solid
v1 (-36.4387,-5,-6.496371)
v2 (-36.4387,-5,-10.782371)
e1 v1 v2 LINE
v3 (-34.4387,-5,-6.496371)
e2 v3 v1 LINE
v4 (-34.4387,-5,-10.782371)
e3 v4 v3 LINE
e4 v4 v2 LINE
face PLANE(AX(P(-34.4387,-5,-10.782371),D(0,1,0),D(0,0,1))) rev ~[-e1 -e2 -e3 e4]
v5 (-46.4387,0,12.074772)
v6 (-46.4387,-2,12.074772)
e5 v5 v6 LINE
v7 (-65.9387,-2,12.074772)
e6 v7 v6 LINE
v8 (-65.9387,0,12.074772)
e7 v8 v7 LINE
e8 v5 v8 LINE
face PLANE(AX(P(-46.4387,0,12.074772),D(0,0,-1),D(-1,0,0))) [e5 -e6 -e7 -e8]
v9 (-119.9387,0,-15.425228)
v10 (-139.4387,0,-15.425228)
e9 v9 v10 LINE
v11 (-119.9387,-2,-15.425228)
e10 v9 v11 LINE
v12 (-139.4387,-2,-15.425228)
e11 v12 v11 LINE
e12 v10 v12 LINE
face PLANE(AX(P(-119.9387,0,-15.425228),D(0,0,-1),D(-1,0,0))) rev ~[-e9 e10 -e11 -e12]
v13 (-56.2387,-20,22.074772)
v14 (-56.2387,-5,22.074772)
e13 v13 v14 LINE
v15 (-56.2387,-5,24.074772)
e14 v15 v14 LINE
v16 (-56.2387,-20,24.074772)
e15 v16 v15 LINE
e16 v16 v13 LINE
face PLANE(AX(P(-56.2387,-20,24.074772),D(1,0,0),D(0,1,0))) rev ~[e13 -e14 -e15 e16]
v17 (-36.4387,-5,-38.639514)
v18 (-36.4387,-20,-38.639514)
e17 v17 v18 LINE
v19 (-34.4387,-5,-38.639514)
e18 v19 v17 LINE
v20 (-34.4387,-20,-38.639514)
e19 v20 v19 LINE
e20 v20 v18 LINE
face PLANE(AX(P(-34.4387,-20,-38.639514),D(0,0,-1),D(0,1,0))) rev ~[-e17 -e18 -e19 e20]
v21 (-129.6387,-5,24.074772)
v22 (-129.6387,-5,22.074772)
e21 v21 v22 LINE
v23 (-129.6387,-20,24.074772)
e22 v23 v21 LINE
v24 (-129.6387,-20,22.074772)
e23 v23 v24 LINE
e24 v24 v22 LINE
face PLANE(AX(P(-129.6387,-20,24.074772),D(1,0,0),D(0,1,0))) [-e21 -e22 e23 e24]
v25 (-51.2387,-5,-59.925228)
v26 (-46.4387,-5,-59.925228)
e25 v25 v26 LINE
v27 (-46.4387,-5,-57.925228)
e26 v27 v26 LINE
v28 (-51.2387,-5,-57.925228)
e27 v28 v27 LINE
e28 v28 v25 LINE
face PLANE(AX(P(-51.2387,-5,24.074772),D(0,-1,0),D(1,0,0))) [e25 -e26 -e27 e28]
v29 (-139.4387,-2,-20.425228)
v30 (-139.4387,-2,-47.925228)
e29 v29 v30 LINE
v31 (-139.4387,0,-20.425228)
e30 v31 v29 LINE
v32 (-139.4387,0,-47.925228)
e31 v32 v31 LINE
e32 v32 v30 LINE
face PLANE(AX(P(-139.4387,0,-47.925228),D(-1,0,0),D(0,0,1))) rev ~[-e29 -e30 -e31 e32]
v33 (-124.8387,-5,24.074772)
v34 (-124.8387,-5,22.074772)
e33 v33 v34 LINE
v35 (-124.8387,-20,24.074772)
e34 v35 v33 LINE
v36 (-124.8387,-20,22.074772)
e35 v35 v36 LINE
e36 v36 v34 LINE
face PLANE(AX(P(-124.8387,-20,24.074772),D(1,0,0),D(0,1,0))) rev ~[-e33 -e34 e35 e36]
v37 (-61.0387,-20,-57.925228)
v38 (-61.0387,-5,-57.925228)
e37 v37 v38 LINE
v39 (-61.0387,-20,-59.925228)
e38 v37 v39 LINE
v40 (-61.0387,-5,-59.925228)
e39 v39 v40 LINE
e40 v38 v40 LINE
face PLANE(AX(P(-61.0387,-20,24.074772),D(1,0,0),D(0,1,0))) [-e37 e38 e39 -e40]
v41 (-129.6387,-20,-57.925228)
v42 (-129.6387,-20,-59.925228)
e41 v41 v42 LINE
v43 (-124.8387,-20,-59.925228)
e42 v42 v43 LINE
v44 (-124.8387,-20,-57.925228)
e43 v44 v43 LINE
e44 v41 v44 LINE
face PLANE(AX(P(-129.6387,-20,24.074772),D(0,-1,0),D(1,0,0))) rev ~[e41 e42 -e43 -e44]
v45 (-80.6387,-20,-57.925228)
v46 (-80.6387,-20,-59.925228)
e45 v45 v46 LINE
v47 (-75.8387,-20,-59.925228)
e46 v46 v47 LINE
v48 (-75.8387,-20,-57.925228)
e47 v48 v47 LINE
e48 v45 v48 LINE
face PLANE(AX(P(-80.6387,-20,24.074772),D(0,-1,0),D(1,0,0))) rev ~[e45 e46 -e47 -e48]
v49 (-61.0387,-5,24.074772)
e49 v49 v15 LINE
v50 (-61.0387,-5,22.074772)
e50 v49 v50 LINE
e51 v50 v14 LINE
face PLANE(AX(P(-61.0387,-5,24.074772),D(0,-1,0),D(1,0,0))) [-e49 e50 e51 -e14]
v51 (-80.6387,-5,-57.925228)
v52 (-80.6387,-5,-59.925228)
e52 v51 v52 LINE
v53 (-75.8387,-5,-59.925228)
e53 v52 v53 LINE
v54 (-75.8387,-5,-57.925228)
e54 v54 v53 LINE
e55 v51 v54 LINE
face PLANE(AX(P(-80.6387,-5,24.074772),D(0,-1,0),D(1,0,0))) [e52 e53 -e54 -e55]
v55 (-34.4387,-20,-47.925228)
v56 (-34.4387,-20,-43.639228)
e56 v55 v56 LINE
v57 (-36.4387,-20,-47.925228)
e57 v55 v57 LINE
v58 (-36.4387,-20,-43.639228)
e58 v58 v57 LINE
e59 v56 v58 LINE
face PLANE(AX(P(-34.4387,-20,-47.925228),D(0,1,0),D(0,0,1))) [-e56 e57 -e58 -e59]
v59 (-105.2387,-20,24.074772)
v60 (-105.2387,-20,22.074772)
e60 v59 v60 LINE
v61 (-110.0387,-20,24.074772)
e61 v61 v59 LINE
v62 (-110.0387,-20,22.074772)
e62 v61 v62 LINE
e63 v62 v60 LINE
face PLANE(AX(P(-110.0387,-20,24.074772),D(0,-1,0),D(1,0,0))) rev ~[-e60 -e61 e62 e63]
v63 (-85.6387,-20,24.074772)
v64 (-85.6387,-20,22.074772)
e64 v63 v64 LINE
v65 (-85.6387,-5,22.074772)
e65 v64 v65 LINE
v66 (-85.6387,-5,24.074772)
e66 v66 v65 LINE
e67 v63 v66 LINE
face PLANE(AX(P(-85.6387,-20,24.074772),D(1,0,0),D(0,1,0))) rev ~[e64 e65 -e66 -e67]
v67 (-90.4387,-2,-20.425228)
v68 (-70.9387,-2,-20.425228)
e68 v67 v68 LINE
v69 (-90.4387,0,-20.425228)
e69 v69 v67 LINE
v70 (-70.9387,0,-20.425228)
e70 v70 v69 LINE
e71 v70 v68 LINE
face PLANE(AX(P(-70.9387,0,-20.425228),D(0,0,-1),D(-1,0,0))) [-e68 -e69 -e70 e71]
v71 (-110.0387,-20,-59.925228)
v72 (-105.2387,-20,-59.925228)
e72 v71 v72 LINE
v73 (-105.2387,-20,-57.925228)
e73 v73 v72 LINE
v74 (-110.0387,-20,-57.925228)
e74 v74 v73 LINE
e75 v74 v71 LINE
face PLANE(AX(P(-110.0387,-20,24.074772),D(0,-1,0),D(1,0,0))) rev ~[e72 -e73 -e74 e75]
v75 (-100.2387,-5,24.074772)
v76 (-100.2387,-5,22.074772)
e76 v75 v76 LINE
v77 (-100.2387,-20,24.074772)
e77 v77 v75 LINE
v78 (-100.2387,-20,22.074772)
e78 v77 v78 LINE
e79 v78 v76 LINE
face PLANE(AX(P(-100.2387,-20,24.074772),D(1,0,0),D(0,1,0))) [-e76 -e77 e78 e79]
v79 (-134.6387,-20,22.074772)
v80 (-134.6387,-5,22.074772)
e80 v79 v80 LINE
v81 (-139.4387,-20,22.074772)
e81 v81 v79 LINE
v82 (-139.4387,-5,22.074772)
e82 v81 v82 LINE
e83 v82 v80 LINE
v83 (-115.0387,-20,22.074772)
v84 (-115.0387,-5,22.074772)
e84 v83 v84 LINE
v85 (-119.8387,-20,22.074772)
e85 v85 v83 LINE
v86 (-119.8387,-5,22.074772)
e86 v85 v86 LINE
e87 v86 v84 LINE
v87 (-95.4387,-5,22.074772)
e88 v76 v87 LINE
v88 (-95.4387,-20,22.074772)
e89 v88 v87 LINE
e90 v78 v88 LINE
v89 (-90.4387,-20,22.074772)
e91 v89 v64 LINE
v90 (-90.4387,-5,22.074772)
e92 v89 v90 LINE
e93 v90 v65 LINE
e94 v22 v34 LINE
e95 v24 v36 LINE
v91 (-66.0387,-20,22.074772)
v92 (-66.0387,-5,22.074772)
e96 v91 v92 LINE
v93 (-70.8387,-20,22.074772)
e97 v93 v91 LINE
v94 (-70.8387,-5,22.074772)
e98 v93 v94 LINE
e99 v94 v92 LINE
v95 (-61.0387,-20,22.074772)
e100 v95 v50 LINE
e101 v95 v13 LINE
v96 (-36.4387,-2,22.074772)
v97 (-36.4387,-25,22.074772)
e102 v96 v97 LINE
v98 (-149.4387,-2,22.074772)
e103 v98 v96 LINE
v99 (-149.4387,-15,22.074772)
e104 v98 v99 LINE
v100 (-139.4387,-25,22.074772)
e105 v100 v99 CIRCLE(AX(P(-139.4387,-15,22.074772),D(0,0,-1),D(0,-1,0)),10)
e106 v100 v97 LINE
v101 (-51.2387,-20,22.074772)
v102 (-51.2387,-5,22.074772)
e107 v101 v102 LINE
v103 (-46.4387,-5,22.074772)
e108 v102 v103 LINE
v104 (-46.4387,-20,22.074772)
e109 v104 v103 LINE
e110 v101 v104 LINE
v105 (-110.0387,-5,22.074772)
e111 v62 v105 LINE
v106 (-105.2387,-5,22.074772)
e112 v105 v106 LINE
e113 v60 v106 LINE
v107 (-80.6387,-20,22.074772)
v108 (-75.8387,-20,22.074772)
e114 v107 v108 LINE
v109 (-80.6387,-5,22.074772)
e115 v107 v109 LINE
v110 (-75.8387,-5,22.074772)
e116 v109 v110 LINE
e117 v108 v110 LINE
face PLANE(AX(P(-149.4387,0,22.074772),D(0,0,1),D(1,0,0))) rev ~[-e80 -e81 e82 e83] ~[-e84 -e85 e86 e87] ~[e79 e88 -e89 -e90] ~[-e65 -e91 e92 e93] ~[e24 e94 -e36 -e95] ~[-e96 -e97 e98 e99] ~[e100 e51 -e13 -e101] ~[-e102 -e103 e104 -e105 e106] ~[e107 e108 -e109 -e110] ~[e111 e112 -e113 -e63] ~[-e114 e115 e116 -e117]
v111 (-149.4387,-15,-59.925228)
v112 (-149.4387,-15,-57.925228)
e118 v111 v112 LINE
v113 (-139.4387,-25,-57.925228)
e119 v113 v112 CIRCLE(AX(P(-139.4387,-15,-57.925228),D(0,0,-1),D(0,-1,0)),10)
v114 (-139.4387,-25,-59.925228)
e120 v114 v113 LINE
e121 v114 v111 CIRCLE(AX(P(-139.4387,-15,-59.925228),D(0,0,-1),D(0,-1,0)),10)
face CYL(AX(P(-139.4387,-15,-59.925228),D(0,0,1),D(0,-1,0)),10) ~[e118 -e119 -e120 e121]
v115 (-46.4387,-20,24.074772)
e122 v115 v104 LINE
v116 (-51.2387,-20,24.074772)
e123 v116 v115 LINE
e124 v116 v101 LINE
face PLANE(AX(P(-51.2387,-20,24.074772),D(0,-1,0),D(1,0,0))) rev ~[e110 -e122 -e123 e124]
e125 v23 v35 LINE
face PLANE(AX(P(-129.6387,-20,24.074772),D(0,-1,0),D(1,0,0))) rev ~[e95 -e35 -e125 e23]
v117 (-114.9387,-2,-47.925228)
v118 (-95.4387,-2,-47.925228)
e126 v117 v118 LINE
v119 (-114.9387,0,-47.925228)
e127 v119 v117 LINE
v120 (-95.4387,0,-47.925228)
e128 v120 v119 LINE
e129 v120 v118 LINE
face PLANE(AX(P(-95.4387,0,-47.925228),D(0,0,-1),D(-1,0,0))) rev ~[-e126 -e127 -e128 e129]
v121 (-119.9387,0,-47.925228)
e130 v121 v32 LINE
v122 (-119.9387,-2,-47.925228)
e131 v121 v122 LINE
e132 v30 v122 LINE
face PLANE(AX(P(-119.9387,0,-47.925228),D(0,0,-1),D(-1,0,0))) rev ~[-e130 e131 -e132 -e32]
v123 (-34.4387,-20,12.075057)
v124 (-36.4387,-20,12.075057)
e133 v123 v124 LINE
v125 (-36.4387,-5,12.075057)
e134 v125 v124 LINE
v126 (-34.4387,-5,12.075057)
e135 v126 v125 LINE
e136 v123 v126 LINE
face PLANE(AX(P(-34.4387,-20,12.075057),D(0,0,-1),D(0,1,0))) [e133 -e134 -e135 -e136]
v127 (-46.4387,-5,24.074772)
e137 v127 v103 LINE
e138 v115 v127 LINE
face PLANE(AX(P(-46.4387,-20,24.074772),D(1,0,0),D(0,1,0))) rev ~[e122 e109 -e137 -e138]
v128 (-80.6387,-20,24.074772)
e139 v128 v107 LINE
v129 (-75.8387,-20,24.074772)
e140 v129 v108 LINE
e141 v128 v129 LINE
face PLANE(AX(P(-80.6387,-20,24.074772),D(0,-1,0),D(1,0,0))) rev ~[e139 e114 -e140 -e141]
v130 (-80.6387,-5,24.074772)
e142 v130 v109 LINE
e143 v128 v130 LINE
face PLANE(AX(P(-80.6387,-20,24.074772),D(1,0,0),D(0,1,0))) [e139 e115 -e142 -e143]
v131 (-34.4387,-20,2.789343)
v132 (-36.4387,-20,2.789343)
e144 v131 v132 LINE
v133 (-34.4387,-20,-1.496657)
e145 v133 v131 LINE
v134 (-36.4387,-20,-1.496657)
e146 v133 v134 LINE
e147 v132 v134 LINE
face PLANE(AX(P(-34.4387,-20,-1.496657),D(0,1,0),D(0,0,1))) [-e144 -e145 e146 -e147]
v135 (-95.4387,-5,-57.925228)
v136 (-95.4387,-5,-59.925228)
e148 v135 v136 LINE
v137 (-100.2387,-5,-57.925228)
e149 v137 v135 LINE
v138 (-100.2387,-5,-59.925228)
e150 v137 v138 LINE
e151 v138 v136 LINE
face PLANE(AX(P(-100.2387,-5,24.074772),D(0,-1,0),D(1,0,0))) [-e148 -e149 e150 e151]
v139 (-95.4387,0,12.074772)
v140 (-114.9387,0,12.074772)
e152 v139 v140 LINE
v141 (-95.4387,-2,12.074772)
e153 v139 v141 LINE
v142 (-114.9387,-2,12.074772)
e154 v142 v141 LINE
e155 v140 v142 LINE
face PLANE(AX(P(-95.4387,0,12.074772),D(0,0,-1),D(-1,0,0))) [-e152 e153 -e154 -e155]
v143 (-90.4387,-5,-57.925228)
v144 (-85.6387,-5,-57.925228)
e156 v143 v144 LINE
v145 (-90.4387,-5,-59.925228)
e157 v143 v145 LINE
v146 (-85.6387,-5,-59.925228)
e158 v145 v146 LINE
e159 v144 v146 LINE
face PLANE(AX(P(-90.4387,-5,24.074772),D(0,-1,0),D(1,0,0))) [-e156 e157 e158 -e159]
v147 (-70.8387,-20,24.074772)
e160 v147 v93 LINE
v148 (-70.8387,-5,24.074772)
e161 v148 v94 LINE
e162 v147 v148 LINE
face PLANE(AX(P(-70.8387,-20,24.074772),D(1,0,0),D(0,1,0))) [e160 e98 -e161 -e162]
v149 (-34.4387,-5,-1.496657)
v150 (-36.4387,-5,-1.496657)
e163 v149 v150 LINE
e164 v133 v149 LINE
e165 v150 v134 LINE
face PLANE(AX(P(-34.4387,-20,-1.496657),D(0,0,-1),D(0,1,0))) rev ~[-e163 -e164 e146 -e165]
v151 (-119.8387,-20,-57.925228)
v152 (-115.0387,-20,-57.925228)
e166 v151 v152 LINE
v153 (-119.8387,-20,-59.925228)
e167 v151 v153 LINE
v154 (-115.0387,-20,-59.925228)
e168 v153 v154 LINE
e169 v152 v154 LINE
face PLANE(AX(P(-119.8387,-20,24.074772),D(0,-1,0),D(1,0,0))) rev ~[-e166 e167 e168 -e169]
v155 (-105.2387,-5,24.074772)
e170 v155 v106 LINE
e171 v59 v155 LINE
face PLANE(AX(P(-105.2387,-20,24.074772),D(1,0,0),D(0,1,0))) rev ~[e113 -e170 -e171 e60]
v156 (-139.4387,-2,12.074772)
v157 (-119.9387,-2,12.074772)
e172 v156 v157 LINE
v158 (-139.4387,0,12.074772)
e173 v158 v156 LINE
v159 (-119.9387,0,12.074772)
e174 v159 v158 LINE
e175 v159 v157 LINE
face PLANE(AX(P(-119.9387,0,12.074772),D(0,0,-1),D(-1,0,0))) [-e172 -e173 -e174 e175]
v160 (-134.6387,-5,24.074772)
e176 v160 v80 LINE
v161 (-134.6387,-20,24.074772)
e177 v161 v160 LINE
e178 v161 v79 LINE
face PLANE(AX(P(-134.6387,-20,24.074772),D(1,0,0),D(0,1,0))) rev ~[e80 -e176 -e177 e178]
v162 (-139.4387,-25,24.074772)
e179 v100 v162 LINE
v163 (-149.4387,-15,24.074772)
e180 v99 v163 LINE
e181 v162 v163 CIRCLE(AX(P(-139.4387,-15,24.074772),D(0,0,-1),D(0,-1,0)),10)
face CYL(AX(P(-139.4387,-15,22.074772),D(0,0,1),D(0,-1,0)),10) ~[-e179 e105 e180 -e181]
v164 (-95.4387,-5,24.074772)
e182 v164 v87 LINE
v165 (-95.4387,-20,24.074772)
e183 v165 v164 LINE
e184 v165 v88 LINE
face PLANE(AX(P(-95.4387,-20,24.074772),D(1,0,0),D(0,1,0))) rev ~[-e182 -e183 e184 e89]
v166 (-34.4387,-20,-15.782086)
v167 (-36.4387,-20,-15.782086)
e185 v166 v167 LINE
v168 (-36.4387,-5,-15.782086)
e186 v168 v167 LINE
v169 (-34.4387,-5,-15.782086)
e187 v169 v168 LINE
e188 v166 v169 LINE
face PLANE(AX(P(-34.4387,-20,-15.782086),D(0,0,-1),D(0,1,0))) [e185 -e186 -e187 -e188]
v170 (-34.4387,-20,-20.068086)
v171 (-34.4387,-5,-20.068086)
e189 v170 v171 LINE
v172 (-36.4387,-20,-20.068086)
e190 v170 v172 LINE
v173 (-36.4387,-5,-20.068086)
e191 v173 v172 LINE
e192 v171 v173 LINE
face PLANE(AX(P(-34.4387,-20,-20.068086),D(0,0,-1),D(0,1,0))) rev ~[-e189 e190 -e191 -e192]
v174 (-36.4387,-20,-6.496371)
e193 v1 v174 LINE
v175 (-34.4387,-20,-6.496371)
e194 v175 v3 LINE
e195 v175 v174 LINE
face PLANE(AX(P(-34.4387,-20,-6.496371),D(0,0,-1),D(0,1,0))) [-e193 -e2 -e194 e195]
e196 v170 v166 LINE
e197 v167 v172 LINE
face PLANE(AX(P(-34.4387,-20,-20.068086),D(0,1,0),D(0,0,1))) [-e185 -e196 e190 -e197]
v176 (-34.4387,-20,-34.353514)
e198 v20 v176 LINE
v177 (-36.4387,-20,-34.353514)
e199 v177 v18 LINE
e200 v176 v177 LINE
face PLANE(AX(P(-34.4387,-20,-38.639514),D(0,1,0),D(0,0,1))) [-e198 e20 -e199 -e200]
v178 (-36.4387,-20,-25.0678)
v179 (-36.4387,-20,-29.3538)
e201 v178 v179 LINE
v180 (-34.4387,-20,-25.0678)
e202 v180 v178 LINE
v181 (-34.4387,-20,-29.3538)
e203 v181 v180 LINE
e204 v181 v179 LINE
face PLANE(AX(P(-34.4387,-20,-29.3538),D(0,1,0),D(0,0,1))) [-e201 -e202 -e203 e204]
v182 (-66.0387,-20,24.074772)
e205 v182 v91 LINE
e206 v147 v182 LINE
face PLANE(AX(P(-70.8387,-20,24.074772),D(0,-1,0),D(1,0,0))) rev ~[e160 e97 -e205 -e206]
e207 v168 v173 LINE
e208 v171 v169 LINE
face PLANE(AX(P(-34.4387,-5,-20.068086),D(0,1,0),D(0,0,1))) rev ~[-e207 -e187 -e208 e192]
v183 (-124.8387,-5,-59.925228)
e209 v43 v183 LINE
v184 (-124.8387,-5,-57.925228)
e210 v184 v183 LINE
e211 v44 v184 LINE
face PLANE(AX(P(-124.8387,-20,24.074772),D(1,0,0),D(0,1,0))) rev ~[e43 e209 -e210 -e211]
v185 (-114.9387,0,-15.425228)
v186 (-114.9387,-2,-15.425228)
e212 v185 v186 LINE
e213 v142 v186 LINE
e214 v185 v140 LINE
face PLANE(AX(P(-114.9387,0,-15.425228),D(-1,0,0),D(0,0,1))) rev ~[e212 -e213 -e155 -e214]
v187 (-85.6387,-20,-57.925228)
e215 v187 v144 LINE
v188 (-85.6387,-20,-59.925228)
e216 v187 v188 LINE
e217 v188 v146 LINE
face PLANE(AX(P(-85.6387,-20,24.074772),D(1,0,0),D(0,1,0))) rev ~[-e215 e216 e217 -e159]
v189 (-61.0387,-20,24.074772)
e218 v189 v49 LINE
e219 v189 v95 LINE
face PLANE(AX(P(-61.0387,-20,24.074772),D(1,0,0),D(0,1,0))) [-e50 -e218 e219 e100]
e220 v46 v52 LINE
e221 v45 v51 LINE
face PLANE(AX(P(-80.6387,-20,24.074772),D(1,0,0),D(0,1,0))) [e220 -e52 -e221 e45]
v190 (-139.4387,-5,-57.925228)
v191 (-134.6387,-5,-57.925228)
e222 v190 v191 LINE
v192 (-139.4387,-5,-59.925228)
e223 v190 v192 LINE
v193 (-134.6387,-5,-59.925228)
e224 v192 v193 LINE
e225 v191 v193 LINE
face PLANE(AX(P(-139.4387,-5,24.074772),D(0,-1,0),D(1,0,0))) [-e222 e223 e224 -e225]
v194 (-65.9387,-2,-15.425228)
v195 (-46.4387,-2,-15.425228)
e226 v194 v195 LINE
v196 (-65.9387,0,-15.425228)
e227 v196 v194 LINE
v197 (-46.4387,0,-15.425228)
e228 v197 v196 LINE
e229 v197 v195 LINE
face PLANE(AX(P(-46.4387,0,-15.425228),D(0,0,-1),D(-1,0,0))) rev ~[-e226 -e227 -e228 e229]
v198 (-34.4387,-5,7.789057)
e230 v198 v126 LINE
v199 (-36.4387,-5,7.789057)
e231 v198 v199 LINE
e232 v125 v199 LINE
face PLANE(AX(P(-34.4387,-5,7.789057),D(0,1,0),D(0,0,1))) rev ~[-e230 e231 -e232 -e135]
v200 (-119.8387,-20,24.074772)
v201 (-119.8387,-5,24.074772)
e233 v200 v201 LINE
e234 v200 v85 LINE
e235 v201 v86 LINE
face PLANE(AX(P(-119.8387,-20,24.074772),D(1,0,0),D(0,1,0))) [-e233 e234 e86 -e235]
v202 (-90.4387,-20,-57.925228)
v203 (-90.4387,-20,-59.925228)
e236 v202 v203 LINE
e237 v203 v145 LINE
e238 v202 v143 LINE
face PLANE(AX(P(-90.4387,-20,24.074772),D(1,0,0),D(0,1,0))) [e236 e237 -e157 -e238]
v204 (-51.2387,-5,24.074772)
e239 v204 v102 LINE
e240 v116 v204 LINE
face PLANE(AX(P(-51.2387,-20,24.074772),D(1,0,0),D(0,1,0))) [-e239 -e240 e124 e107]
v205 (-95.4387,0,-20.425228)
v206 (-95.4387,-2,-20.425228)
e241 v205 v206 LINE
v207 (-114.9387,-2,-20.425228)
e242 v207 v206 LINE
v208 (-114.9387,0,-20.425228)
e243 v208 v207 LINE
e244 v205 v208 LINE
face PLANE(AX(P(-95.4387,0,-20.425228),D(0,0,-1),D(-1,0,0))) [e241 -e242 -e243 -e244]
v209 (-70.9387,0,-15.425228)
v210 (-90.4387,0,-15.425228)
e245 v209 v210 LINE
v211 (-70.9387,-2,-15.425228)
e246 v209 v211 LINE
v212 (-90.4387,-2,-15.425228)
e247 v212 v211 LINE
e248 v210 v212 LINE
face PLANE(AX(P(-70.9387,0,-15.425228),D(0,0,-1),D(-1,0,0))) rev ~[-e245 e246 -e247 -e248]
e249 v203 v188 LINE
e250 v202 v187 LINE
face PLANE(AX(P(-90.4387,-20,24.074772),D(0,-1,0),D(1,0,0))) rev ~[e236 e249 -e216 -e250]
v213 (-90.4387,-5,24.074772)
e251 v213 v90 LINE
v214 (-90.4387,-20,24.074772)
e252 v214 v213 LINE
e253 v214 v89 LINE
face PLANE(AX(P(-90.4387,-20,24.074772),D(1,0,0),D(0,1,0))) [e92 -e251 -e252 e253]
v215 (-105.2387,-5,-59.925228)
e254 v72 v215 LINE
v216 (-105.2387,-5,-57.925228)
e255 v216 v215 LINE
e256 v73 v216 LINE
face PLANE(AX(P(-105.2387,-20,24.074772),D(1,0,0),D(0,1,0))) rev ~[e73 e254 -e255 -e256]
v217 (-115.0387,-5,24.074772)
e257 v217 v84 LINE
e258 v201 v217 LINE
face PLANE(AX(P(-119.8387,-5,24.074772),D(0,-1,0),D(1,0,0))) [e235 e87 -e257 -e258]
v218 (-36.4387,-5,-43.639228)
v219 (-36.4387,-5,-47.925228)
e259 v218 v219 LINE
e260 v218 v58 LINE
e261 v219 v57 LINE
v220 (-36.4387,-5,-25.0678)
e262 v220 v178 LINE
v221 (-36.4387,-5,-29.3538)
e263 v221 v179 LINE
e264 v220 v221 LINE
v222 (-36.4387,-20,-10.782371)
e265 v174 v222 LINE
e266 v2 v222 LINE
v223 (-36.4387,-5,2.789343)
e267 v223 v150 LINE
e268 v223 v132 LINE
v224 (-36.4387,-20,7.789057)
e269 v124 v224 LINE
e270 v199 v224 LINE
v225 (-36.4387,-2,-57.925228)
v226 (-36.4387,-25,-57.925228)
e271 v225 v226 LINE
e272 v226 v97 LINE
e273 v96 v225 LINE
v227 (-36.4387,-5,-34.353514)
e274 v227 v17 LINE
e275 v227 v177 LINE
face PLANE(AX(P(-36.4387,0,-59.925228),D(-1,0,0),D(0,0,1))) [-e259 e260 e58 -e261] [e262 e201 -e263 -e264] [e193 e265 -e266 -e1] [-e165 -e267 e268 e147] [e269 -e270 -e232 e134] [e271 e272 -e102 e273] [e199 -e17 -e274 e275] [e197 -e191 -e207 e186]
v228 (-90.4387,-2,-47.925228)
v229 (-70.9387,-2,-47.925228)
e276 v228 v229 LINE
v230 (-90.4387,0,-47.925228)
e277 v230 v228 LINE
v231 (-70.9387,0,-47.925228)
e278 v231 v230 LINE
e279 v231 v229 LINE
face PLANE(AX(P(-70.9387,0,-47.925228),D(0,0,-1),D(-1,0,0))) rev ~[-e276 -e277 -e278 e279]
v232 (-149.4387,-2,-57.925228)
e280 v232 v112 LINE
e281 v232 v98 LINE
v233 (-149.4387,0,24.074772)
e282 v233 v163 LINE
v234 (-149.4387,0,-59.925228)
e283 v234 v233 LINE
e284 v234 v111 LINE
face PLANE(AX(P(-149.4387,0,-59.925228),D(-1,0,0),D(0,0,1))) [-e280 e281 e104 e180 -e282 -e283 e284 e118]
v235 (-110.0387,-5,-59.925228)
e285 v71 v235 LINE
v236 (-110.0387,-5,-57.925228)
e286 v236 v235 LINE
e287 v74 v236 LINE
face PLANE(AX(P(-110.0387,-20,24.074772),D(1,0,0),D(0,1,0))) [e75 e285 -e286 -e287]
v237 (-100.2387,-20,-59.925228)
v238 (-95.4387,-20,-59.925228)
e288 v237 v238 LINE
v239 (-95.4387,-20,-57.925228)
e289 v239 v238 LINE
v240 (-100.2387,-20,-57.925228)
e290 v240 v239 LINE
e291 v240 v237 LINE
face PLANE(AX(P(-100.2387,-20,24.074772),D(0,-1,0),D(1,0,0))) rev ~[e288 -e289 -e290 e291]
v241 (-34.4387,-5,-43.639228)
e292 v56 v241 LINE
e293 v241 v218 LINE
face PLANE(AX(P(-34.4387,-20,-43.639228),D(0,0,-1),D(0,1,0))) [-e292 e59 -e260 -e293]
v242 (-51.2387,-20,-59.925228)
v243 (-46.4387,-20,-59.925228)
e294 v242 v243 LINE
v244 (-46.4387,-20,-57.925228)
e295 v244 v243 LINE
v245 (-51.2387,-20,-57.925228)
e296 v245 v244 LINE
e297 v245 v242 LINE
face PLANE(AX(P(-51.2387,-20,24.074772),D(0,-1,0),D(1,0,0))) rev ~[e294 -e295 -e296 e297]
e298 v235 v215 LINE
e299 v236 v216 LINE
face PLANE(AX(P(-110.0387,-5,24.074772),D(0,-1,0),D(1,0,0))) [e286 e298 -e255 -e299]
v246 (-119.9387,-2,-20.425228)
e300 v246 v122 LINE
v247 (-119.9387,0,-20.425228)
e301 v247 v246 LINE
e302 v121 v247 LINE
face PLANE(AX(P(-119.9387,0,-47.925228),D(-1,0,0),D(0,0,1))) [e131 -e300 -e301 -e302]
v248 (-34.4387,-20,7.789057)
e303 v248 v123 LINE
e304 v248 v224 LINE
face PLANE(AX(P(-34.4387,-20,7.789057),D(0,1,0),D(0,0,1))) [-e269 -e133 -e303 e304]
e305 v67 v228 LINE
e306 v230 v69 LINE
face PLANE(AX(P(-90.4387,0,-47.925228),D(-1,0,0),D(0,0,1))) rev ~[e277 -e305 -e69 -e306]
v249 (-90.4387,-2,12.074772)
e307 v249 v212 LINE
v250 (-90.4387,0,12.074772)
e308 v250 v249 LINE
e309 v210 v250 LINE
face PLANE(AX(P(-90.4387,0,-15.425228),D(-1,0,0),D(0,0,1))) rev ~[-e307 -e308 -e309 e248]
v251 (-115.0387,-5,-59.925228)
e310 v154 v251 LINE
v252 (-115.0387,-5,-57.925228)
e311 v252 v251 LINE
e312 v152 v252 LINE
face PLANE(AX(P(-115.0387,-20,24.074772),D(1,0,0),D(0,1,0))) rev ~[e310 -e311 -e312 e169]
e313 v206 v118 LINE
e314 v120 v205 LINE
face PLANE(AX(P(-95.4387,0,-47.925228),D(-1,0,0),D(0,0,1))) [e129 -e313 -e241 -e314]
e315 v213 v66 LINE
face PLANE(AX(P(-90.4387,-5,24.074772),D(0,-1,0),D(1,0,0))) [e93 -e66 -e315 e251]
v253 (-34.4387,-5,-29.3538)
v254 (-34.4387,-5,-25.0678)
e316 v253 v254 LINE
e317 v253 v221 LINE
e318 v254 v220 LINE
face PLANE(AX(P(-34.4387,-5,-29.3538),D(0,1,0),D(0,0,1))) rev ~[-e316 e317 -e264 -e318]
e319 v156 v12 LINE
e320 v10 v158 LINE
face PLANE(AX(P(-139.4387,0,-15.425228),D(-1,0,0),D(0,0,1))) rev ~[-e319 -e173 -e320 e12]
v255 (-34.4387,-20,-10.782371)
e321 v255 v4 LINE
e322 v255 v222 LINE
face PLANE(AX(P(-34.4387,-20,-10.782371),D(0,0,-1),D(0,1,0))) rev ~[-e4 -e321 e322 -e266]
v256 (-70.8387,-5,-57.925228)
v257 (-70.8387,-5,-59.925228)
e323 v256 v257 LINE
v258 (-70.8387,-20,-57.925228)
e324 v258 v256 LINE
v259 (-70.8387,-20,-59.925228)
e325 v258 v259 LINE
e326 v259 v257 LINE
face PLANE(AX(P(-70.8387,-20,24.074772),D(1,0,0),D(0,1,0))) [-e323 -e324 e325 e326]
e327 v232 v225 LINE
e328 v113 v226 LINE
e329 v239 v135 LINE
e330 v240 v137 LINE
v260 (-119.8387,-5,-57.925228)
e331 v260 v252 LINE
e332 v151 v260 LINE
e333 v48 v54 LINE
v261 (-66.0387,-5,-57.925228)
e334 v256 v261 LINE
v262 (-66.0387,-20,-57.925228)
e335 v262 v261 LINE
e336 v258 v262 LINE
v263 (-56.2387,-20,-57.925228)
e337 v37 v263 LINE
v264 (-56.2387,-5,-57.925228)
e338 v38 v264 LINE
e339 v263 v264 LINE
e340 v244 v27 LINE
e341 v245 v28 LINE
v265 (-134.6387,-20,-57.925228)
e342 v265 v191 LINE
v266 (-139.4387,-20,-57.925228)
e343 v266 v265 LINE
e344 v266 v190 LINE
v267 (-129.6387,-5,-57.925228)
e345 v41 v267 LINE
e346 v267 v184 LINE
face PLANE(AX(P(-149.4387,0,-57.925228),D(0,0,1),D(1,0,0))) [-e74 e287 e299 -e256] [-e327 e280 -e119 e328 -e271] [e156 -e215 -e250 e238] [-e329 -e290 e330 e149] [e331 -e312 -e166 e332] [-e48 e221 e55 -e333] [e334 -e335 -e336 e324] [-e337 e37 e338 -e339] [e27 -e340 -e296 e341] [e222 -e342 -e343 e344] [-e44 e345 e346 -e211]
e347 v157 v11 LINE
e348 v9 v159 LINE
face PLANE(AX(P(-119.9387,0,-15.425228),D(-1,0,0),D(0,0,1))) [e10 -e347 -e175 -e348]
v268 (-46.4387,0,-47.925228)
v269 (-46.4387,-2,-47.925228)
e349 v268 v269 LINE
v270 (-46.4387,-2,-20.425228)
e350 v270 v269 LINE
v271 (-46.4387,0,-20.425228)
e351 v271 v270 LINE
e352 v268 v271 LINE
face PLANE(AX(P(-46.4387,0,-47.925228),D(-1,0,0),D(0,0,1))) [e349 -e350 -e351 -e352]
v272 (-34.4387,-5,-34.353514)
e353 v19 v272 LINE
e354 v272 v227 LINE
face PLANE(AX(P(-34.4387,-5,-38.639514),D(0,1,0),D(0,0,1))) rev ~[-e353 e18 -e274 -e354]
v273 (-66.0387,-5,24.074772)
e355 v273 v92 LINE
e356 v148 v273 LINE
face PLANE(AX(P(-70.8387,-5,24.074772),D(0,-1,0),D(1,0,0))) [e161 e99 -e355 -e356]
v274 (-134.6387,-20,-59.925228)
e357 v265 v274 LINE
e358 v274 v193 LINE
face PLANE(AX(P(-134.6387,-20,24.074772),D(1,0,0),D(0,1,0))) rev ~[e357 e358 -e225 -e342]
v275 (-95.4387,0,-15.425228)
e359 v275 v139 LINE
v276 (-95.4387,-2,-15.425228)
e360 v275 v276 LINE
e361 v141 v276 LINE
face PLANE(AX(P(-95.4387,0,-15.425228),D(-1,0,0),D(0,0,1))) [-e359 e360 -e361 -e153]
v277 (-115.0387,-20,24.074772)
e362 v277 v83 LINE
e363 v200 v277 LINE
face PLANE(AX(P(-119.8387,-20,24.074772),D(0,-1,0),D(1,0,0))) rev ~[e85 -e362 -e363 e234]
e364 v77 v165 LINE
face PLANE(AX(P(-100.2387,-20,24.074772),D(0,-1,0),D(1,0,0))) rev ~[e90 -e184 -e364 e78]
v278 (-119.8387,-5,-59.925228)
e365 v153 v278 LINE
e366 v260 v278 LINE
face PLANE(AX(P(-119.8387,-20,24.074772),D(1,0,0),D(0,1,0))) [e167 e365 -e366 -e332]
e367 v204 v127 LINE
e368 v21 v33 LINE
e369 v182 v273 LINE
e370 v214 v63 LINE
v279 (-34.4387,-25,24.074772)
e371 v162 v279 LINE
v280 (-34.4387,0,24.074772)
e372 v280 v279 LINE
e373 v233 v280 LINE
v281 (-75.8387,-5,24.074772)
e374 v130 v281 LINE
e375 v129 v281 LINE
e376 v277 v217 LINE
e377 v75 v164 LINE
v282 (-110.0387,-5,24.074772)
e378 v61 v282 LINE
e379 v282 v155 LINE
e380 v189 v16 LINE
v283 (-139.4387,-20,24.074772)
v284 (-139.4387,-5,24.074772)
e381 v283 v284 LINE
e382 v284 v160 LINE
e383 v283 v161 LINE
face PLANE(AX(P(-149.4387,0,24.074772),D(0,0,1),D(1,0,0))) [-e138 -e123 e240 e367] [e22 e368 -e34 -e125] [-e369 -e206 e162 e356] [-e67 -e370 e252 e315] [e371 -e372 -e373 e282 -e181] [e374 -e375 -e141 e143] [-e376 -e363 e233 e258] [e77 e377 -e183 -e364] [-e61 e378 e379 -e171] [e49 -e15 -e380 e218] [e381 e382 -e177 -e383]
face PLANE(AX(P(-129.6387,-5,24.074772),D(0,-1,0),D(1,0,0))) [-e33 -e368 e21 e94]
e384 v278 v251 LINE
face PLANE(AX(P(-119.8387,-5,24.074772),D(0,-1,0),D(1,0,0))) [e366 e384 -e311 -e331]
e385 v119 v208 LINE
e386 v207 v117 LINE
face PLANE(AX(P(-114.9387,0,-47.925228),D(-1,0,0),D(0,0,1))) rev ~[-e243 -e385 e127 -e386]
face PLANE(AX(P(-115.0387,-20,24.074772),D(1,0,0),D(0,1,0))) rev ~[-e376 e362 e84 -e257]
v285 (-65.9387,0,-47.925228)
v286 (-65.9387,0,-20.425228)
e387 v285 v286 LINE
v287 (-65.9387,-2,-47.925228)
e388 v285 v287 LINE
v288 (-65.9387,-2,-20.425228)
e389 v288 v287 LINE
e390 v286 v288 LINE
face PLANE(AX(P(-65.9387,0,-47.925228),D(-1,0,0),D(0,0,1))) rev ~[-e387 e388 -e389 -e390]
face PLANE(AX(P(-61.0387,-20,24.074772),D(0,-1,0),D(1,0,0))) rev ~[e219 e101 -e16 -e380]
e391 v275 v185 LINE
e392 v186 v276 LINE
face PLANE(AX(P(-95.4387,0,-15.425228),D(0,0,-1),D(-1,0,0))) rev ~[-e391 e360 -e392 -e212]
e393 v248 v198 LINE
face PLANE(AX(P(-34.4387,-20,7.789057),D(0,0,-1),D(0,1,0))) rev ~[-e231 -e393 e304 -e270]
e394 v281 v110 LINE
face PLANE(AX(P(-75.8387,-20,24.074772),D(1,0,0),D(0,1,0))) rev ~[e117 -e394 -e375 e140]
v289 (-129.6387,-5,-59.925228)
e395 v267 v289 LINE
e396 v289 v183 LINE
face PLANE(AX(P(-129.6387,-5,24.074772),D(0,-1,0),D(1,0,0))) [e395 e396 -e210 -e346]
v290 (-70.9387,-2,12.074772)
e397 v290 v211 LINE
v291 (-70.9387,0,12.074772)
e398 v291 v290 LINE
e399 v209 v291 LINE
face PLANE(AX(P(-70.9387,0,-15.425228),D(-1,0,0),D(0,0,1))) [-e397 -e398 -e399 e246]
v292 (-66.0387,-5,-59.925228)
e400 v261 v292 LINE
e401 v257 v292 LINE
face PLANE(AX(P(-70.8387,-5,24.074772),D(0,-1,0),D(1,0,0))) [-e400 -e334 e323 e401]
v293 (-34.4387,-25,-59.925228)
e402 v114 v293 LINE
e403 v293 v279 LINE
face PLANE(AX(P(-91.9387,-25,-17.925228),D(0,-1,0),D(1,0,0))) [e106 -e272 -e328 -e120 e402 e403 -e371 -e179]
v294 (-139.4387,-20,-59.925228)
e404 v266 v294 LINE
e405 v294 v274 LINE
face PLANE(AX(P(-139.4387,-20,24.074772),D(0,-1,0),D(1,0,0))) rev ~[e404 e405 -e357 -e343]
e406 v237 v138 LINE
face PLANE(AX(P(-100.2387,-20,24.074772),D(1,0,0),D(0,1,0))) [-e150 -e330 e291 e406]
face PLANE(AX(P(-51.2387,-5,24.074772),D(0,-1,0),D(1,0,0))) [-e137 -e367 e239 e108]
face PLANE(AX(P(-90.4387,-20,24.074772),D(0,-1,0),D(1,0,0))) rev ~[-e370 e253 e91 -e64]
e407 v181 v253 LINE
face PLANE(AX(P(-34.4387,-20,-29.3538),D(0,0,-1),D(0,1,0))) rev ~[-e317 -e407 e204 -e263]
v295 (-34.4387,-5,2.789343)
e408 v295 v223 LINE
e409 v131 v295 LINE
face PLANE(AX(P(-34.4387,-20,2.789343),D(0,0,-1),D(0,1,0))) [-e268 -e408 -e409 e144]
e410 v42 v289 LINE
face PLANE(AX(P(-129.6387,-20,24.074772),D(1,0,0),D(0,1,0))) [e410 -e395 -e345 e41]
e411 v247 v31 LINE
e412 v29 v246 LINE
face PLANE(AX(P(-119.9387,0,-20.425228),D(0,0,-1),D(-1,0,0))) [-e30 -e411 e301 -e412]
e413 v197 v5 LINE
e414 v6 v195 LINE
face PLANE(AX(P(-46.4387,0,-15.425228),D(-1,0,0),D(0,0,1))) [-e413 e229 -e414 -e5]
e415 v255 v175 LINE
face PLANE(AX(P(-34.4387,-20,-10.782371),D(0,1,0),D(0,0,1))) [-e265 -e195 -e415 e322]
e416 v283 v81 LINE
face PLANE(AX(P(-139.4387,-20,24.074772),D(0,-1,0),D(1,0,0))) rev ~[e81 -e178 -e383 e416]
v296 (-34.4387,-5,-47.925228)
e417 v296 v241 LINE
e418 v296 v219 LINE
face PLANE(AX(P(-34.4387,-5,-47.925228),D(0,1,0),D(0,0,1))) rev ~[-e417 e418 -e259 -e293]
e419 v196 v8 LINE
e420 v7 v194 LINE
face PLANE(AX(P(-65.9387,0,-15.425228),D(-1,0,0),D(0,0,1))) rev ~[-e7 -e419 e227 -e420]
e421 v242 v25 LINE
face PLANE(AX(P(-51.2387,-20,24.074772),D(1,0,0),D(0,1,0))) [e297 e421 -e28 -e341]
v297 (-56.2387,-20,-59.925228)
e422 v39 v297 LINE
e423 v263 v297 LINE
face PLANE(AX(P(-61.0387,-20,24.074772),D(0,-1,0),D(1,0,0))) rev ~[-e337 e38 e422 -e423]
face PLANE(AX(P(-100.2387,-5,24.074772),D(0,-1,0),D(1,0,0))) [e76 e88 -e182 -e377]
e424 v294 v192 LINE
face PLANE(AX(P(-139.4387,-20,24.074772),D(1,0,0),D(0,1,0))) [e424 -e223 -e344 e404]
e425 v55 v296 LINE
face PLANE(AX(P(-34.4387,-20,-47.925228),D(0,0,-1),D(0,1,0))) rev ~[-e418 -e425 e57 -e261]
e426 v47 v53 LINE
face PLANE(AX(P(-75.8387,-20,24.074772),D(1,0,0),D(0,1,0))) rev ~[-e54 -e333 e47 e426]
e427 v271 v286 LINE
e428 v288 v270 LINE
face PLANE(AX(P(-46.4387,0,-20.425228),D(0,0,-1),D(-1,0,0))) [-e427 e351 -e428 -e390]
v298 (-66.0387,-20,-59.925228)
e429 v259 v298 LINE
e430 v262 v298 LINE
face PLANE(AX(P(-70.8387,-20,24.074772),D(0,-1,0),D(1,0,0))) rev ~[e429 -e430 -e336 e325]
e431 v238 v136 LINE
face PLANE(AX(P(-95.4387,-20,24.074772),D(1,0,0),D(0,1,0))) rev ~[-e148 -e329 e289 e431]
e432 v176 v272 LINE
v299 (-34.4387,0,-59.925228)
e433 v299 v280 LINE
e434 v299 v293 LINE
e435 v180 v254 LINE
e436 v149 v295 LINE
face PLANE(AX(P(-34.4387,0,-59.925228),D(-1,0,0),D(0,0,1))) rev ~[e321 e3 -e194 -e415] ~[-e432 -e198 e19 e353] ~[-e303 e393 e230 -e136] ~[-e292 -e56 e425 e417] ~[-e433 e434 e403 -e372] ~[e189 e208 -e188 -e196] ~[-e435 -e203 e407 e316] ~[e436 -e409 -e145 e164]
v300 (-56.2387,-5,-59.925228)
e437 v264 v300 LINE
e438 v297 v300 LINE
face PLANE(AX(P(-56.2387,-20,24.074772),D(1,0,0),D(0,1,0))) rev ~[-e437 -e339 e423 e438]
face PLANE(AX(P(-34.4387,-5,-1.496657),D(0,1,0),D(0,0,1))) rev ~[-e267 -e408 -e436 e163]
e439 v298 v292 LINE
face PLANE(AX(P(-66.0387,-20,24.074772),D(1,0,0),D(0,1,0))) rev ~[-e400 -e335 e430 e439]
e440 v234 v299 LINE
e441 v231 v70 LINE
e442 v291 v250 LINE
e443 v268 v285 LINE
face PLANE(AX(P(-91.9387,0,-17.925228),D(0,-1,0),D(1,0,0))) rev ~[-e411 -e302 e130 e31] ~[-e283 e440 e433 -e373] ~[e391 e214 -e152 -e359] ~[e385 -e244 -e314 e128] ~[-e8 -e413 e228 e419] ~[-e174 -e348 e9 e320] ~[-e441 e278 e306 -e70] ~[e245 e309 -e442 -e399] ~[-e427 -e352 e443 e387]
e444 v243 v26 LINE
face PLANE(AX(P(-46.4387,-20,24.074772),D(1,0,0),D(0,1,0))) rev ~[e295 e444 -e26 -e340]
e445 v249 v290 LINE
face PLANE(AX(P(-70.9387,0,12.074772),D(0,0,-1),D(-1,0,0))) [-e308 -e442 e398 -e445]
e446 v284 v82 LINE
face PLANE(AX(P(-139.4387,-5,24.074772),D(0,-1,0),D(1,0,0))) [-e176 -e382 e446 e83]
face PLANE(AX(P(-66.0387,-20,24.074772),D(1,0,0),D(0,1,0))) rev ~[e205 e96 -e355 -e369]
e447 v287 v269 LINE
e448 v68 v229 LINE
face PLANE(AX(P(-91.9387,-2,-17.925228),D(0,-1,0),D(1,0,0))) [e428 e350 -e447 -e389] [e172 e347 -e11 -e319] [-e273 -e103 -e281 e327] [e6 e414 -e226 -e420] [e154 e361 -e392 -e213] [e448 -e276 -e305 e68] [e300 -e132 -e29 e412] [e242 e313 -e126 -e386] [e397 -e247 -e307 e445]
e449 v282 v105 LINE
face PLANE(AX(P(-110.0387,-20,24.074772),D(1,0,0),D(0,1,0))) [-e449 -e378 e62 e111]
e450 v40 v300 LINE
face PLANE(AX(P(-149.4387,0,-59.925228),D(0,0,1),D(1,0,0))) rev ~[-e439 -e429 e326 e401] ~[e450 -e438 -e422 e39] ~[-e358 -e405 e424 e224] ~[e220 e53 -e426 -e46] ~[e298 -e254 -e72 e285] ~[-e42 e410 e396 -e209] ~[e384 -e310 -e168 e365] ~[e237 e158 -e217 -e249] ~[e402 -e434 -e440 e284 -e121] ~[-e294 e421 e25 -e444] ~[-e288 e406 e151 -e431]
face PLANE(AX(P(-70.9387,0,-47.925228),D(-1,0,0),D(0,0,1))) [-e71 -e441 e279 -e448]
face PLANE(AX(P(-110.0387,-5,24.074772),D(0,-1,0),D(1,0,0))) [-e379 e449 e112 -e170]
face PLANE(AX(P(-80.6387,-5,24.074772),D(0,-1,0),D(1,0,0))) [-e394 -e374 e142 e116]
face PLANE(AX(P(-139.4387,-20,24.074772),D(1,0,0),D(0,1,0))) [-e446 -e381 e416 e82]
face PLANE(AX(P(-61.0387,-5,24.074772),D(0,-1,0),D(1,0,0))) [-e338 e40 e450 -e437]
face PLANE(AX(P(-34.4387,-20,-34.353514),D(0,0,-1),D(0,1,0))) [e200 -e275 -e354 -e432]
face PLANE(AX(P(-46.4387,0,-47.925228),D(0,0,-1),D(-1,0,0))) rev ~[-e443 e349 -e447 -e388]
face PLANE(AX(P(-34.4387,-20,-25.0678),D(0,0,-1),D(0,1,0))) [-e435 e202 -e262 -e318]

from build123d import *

# Parameters (mm, degrees)
F0_W     = 115
F0_H     = 84
F1_DEPTH = 25
F2_T     = -2
F3_R     = 10
F4_W     = 19.5
F4_H     = 27.5
F5_DEPTH = 25
F6_W     = 4.8
F6_H     = 15
F7_DEPTH = 84.001
F8_W     = 15
F8_H     = 4.286
F9_DEPTH = 25


with BuildPart() as f1:
    # F0 (on Front) → F1 (new body)
    with BuildSketch(Plane.XZ):
        with Locations((-91.9387002908, -17.9252284579)):
            Rectangle(F0_W, F0_H)
    extrude(amount=F1_DEPTH)

    # F2
    f2_openings = [f1.faces().sort_by_distance(p)[0] for p in [
        (-91.9387, -25, -17.925228),
        (-149.4387, -12.5, -17.925228),
    ]]
    offset(amount=F2_T, openings=f2_openings)

    # F3
    f3_edges = [f1.edges().sort_by_distance(p)[0] for p in [
        (-149.4387, -25, 23.074772),
        (-149.4387, -25, -58.925228),
    ]]
    fillet(f3_edges, radius=F3_R)

    # F4 (on face) → F5 (cut)
    with BuildSketch(Plane(origin=(0, 0, 0), x_dir=(-1, 0, 0), z_dir=(0, 1, 0))):
        with Locations((56.1887002908, -1.6752284579)):
            Rectangle(F4_W, F4_H)
        with Locations((80.6887002908, -1.6752284579)):
            Rectangle(F4_W, F4_H)
        with Locations((105.1887002908, -1.6752284579)):
            Rectangle(F4_W, F4_H)
        with Locations((129.6887002908, -1.6752284579)):
            Rectangle(F4_W, F4_H)
        with Locations((129.6887002908, -34.1752284579)):
            Rectangle(F4_W, F4_H)
        with Locations((105.1887002908, -34.1752284579)):
            Rectangle(F4_W, F4_H)
        with Locations((80.6887002908, -34.1752284579)):
            Rectangle(F4_W, F4_H)
        with Locations((56.1887002908, -34.1752284579)):
            Rectangle(F4_W, F4_H)
    extrude(amount=-F5_DEPTH, mode=Mode.SUBTRACT)

    # F6 (on face) → F7 (cut, through all)
    with BuildSketch(Plane.XY.offset(24.0747715421)):
        with Locations((-48.8387002908, -12.5)):
            Rectangle(F6_W, F6_H)
        with Locations((-58.6387002908, -12.5)):
            Rectangle(F6_W, F6_H)
        with Locations((-68.4387002908, -12.5)):
            Rectangle(F6_W, F6_H)
        with Locations((-78.2387002908, -12.5)):
            Rectangle(F6_W, F6_H)
        with Locations((-88.0387002908, -12.5)):
            Rectangle(F6_W, F6_H)
        with Locations((-97.8387002908, -12.5)):
            Rectangle(F6_W, F6_H)
        with Locations((-107.6387002908, -12.5)):
            Rectangle(F6_W, F6_H)
        with Locations((-117.4387002908, -12.5)):
            Rectangle(F6_W, F6_H)
        with Locations((-127.2387002908, -12.5)):
            Rectangle(F6_W, F6_H)
        with Locations((-137.0387002908, -12.5)):
            Rectangle(F6_W, F6_H)
    extrude(amount=-F7_DEPTH, mode=Mode.SUBTRACT)

    # F8 (on face) → F9 (cut)
    with BuildSketch(Plane.YZ.offset(-34.4387002908)):
        with Locations((-12.5, -45.7822284579)):
            Rectangle(F8_W, F8_H)
        with Locations((-12.5, -36.4965141579)):
            Rectangle(F8_W, F8_H)
        with Locations((-12.5, -27.2107998579)):
            Rectangle(F8_W, F8_H)
        with Locations((-12.5, -17.9250855579)):
            Rectangle(F8_W, F8_H)
        with Locations((-12.5, -8.6393712579)):
            Rectangle(F8_W, F8_H)
        with Locations((-12.5, 0.6463430421)):
            Rectangle(F8_W, F8_H)
        with Locations((-12.5, 9.9320573421)):
            Rectangle(F8_W, F8_H)
    extrude(amount=-F9_DEPTH, mode=Mode.SUBTRACT)


solid = f1.part
